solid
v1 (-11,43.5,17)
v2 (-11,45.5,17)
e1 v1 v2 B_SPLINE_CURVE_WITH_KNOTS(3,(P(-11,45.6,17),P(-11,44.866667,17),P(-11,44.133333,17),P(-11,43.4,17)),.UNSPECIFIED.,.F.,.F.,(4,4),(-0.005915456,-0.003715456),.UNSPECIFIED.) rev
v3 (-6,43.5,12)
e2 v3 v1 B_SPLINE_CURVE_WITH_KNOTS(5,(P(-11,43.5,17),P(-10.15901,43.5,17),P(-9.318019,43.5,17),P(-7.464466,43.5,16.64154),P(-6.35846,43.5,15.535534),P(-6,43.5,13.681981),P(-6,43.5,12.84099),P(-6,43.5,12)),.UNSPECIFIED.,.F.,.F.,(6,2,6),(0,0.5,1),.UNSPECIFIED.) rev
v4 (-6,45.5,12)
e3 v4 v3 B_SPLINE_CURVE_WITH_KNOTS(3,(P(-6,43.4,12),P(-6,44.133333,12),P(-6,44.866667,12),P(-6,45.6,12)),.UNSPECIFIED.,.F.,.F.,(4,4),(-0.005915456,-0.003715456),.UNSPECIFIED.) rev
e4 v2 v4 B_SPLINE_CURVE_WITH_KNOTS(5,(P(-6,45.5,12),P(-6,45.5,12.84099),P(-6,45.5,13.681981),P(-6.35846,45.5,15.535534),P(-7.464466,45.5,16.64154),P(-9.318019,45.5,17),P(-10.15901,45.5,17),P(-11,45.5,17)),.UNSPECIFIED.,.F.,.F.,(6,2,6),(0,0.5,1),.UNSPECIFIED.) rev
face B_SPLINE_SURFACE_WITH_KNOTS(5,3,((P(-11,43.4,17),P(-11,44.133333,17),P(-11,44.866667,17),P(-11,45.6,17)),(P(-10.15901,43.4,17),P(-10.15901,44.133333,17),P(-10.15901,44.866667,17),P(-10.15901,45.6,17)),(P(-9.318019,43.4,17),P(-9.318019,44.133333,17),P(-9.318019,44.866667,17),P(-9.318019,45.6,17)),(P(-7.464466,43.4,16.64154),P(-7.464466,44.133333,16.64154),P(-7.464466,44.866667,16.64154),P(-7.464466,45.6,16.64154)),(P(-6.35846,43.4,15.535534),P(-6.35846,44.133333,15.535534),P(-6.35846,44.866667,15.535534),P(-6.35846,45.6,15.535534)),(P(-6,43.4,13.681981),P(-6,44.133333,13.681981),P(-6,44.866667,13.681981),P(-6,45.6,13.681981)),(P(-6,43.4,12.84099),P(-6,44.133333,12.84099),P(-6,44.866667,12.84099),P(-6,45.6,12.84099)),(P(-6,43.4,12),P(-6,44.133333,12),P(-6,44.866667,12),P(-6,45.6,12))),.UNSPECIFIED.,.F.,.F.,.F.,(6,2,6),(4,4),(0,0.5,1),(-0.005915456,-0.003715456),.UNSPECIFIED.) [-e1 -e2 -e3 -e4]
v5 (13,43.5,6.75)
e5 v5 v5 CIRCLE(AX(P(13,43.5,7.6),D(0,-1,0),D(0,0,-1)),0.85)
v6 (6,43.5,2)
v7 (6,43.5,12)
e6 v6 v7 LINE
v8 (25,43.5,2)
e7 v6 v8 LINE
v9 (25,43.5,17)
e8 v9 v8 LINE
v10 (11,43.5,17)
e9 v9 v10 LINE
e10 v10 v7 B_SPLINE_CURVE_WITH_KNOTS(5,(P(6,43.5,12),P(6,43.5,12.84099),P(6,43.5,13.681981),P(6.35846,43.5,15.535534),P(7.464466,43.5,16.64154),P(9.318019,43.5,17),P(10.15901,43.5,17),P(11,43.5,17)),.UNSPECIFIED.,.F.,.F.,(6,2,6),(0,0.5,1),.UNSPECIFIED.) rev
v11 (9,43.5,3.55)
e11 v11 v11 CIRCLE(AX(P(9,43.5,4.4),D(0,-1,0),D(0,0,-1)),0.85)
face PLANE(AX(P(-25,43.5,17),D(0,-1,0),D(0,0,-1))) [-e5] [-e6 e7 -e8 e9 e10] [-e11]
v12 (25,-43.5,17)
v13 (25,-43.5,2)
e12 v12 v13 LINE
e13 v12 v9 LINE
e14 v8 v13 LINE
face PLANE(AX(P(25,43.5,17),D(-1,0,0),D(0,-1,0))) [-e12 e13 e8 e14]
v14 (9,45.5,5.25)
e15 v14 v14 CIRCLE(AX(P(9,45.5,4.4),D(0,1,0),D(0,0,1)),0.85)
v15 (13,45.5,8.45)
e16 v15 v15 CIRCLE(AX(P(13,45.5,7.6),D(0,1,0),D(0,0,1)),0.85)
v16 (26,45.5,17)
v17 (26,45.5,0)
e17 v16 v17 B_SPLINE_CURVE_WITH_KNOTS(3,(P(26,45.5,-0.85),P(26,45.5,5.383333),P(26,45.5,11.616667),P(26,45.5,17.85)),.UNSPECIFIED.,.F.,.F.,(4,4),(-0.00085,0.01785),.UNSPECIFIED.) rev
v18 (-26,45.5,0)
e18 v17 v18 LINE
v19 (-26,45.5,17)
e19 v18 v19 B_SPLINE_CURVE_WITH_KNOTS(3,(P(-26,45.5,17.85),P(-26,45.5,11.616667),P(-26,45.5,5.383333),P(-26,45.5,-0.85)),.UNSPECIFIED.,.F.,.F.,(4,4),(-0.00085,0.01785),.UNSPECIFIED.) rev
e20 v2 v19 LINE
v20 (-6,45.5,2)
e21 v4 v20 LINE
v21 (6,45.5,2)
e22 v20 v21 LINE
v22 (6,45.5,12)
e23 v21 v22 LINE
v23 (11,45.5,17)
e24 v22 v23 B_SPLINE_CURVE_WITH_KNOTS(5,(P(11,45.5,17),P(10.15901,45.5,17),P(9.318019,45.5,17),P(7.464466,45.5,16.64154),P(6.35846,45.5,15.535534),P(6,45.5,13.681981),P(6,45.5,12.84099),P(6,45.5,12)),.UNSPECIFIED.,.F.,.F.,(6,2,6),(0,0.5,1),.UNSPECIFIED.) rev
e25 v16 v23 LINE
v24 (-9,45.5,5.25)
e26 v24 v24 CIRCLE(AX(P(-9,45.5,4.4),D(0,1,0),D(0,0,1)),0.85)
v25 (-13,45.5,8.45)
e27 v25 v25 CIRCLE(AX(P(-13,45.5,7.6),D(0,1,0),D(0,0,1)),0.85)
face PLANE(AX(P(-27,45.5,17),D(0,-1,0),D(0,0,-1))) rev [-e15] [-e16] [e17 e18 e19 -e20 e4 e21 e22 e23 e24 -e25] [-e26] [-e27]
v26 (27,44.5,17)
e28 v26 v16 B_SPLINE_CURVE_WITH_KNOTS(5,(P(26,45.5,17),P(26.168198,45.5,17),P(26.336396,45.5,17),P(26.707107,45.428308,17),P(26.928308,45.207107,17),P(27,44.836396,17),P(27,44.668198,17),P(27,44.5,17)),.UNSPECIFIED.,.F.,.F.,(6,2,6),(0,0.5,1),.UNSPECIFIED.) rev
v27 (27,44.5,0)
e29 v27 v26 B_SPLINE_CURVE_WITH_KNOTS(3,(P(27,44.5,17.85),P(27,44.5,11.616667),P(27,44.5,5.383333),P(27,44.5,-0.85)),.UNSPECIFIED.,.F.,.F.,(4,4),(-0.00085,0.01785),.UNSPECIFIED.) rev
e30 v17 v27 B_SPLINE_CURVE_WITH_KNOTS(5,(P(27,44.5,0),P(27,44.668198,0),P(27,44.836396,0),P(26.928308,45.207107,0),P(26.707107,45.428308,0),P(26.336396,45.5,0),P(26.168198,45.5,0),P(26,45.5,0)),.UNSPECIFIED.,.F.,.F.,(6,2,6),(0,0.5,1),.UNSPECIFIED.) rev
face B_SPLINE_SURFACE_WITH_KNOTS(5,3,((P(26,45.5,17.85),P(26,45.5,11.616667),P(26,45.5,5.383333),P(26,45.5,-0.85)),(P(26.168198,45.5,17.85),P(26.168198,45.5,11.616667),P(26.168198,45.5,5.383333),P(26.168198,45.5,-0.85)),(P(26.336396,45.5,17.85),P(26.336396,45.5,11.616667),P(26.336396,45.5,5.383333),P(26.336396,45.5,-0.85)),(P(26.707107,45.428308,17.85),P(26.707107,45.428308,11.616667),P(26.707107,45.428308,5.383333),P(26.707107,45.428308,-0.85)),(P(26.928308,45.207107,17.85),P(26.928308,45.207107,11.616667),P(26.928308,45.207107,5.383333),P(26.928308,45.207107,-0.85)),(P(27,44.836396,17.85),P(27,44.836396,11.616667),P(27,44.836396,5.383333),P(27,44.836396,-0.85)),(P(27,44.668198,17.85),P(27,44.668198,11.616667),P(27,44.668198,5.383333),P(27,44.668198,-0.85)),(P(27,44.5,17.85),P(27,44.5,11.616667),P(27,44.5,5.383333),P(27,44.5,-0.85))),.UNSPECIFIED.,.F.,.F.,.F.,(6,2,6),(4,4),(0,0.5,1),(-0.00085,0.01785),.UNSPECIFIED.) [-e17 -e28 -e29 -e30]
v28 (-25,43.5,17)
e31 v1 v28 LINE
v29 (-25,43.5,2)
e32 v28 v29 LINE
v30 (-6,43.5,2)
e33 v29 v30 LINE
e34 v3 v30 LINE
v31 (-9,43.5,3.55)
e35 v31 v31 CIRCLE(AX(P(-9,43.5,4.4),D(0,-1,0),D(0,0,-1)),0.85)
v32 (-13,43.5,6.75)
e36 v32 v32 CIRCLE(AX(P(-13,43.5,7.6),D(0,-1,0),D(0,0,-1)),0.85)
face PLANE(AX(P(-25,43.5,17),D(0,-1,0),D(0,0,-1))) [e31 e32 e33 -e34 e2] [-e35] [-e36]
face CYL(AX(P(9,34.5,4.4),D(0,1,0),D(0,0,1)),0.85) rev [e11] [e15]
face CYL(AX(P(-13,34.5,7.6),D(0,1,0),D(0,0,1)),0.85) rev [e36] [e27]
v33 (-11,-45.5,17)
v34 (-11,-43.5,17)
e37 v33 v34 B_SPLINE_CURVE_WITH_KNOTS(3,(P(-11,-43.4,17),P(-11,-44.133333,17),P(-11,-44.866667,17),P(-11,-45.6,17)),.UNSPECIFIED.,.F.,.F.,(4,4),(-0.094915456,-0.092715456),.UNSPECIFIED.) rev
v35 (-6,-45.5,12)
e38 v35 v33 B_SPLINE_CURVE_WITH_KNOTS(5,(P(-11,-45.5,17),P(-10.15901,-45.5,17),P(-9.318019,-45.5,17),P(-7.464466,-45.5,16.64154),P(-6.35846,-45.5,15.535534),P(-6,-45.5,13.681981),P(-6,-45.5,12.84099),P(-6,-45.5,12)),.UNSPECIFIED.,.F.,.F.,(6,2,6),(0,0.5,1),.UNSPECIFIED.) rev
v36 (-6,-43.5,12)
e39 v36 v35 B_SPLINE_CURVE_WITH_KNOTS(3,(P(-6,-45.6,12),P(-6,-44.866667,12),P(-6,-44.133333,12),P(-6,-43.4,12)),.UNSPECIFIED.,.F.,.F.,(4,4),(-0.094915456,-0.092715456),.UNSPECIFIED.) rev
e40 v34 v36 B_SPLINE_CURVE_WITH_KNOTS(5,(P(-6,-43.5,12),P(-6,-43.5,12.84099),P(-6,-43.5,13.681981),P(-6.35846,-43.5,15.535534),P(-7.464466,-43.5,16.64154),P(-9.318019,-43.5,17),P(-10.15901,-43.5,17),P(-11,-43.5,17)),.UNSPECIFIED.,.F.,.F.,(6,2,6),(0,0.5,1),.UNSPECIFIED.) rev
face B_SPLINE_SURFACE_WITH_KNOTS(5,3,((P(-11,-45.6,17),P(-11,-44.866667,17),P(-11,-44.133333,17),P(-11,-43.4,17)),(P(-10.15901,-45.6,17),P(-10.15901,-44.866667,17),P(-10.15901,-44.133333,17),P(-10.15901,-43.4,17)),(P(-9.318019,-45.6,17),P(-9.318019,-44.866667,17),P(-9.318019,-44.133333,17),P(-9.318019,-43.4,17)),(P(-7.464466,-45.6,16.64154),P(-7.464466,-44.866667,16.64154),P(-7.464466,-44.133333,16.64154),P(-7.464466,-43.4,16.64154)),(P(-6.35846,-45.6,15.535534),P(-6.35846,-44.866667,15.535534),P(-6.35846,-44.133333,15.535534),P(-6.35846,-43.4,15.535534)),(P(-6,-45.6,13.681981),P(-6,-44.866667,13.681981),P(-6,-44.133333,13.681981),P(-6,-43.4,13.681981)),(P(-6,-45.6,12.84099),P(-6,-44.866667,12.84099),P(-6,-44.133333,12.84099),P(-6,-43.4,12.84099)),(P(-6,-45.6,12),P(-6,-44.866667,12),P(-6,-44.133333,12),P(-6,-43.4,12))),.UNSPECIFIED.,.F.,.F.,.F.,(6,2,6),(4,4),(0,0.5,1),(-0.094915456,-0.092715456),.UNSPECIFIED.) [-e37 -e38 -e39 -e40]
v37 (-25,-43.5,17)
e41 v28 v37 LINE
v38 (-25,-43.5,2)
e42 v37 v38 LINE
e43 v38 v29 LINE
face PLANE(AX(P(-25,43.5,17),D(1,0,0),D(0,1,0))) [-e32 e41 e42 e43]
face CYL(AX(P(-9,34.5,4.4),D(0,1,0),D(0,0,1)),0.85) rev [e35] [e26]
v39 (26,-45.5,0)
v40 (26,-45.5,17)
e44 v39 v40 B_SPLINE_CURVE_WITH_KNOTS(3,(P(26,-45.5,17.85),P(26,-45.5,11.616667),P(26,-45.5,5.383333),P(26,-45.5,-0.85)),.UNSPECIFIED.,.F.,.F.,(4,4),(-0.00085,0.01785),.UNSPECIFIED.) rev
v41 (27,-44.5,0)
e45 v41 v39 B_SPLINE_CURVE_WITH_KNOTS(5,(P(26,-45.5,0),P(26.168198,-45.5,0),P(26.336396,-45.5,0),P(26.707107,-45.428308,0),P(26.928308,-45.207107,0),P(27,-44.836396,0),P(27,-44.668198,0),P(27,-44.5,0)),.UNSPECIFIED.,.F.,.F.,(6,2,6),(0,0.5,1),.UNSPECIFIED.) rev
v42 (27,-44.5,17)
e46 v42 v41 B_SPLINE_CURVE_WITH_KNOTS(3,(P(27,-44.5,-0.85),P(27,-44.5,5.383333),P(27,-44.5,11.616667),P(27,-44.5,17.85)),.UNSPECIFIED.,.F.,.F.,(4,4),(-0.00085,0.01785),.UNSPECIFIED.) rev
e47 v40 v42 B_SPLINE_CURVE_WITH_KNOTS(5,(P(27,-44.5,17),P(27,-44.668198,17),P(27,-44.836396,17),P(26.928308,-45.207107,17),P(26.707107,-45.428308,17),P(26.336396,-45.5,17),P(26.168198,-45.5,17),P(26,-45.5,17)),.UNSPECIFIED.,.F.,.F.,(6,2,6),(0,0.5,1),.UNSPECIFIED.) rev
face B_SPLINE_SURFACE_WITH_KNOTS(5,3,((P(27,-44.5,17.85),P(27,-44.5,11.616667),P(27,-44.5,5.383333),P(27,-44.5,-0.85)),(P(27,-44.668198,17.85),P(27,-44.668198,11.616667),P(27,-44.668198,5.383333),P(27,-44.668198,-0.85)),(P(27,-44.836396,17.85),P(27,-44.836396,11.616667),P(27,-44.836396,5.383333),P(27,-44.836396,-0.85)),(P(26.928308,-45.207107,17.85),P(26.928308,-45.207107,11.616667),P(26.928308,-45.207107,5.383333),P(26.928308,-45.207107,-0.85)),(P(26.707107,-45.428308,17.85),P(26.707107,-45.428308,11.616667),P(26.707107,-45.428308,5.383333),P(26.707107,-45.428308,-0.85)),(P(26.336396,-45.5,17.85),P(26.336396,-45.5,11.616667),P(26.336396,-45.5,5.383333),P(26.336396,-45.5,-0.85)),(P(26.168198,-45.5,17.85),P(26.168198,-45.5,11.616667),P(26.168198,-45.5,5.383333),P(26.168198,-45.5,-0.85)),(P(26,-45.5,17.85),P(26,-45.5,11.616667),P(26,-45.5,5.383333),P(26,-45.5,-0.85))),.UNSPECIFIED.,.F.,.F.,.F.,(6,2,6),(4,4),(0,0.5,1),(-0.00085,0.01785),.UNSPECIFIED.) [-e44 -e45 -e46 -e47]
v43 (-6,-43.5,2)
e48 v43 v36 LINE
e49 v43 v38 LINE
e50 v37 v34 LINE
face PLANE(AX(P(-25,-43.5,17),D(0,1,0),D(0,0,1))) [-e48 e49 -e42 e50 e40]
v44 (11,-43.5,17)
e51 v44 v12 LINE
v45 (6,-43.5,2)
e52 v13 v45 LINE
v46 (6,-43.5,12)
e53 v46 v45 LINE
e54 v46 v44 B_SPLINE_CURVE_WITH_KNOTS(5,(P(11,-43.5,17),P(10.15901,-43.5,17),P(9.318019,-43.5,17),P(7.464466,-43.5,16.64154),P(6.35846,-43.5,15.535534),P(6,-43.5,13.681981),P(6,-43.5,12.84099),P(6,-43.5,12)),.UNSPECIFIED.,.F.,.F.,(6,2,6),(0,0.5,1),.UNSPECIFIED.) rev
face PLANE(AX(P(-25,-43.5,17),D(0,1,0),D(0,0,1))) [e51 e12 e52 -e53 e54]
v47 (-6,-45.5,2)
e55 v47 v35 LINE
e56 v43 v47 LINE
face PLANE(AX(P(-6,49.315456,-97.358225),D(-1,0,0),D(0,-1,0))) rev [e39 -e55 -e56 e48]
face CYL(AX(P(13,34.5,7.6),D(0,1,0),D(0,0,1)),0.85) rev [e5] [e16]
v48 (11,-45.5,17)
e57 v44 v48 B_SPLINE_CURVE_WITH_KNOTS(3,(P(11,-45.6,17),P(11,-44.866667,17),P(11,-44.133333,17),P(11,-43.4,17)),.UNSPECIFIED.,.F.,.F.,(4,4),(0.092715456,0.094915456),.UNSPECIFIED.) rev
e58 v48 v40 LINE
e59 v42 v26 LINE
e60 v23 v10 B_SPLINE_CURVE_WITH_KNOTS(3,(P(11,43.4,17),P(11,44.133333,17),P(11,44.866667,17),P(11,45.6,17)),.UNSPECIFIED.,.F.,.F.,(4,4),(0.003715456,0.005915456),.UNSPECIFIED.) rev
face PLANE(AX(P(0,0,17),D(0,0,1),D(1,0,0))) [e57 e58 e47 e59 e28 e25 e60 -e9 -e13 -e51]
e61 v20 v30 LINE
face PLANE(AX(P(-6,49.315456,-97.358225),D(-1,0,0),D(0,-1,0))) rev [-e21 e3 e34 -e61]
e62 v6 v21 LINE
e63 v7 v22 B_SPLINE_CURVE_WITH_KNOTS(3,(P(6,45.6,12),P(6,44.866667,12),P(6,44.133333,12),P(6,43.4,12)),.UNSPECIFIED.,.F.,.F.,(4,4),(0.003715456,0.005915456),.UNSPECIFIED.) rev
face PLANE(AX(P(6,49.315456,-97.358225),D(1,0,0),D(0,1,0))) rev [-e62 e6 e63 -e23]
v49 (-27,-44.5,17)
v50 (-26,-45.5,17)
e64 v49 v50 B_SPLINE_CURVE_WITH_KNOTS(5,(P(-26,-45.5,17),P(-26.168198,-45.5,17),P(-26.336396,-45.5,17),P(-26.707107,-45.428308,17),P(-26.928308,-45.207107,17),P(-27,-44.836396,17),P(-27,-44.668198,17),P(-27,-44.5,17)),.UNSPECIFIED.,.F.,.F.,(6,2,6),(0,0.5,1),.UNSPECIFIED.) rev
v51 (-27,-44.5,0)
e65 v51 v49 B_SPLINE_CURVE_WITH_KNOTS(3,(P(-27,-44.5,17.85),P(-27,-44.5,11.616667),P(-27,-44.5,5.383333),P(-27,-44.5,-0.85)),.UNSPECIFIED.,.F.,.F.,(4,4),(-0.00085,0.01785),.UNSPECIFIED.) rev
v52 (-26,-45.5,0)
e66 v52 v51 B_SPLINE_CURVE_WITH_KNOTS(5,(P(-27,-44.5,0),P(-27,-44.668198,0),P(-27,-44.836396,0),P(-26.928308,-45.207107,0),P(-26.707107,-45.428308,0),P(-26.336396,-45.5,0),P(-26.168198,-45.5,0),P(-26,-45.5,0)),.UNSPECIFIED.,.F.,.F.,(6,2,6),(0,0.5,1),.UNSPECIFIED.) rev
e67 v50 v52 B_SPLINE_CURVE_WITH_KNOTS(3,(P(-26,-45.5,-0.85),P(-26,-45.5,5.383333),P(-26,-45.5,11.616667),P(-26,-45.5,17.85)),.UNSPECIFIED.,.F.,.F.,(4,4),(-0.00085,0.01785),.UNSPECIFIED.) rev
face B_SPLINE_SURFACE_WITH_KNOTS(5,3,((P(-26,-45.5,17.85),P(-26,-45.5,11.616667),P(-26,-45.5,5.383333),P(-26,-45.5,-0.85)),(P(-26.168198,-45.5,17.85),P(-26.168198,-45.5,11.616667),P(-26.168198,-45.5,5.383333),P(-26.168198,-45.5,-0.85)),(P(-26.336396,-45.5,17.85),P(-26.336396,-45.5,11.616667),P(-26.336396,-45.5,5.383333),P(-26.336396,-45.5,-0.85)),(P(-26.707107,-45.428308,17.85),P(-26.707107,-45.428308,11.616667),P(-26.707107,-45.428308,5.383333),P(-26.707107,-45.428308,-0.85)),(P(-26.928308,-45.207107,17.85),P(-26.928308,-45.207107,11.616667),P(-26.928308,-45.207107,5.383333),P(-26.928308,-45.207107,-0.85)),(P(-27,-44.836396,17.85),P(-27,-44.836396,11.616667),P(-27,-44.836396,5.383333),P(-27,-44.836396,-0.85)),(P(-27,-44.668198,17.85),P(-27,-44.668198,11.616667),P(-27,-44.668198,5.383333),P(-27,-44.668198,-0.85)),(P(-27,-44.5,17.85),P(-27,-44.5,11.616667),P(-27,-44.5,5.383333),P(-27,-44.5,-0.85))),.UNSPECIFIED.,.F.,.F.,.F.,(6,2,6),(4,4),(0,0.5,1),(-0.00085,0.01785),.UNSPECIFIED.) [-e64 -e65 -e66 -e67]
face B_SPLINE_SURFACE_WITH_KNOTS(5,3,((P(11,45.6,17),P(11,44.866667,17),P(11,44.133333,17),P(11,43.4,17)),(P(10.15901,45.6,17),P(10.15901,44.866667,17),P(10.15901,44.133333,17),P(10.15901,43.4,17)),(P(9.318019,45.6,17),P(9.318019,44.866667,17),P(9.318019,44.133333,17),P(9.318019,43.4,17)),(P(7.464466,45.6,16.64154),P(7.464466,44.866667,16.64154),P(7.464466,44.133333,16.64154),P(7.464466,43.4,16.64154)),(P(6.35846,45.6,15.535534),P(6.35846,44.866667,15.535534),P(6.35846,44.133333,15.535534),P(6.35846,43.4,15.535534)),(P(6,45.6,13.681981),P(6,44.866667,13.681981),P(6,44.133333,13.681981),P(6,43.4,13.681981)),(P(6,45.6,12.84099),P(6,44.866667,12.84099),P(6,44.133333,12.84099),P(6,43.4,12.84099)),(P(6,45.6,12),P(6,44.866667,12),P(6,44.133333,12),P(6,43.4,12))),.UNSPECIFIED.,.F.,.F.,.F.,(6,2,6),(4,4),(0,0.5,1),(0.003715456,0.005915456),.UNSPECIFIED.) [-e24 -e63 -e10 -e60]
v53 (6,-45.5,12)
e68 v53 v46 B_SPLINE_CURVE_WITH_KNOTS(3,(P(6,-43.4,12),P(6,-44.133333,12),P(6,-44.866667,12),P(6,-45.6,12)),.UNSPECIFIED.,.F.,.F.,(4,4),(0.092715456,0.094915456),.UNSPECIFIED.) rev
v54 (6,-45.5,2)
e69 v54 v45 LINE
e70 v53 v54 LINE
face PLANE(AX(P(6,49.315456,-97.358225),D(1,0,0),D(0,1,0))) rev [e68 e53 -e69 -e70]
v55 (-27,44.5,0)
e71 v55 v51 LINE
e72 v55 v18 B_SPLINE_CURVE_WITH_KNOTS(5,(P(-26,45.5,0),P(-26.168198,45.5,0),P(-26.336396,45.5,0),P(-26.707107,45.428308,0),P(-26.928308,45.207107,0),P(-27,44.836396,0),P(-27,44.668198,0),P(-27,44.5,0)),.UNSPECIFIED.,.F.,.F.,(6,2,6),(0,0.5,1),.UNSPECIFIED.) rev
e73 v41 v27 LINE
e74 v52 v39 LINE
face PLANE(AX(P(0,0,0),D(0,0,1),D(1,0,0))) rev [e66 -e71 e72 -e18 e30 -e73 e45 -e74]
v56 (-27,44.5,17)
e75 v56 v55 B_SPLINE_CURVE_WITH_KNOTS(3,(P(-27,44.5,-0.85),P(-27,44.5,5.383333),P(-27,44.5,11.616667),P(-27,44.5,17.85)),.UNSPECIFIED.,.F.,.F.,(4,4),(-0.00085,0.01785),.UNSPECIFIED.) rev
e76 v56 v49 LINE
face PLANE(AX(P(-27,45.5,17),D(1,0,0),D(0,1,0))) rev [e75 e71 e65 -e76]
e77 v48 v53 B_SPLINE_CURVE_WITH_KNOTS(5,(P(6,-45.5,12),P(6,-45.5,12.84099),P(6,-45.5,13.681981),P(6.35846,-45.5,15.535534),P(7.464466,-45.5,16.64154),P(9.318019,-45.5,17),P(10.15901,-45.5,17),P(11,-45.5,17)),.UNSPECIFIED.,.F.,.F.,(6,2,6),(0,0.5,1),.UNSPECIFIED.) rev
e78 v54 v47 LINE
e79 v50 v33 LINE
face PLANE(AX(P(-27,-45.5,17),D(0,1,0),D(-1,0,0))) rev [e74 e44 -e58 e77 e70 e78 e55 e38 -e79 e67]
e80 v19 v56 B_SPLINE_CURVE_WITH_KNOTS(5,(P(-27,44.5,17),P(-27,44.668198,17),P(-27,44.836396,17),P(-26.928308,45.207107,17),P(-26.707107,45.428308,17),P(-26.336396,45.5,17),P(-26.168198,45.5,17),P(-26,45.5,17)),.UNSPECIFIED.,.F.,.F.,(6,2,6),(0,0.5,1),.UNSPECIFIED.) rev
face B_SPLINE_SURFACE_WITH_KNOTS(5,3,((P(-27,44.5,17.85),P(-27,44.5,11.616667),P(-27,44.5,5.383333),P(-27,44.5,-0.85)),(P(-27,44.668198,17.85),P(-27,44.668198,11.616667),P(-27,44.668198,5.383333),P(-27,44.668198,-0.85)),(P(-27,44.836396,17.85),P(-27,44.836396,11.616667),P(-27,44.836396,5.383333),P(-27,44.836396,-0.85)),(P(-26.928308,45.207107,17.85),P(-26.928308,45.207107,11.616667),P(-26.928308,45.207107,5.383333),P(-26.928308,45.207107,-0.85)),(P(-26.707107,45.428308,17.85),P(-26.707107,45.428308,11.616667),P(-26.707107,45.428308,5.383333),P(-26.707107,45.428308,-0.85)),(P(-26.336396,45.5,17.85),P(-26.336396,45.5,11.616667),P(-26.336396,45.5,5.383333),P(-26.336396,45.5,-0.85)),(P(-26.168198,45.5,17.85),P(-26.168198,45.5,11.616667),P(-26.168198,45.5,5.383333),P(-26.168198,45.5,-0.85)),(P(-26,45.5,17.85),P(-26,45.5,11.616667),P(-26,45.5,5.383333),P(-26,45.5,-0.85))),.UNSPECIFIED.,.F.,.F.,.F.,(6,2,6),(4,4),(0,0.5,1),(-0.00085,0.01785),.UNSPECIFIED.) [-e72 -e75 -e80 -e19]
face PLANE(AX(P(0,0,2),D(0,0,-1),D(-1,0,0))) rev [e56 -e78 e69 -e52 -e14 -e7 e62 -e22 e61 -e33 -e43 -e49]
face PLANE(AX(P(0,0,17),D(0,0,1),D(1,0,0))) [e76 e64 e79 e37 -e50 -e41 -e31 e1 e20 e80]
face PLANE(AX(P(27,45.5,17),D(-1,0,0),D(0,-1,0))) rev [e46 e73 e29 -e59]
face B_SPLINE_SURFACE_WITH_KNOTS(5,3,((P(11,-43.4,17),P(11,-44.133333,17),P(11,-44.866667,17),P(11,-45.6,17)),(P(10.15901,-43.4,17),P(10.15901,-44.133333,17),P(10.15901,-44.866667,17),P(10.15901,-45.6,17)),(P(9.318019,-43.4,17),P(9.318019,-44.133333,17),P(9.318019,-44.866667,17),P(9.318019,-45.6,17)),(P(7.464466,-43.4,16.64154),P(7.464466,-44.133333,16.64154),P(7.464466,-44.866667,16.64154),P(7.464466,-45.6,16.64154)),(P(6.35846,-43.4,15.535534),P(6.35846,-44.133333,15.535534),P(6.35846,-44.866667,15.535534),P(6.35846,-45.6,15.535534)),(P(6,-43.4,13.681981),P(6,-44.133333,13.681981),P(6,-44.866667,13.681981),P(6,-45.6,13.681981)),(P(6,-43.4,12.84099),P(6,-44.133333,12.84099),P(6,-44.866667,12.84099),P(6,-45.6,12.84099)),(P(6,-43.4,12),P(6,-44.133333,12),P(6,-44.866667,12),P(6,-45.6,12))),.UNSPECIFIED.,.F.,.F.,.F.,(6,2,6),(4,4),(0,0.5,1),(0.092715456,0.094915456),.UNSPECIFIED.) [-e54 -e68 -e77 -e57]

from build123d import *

# Parameters (mm, degrees)
SKETCH_1_W          = 54
SKETCH_1_H          = 91
SKETCH_1_W_2        = 50
SKETCH_1_H_2        = 87
EXTRUDE_1_DEPTH     = 17
SKETCH_2_W          = 54
SKETCH_2_H          = 91
EXTRUDE_2_DEPTH     = 2
SKETCH_3_W          = 12
SKETCH_3_H          = 98.630911944
CUT_EXTRUDE_1_DEPTH = 15
SKETCH_5_R          = 0.85
CUT_EXTRUDE_2_DEPTH = 11
FILLET_1_SIZE       = 1
FILLET_2_SIZE       = 5


with BuildPart() as part:
    # 草图1 → 凸台-拉伸1 (new body)
    with BuildSketch(Plane.XY):
        Rectangle(SKETCH_1_W, SKETCH_1_H)
        Rectangle(SKETCH_1_W_2, SKETCH_1_H_2, mode=Mode.SUBTRACT)
    extrude(amount=EXTRUDE_1_DEPTH)

    # 草图2 → 凸台-拉伸2 (add)
    with BuildSketch(Plane(origin=(0, 0, 0), x_dir=(-1, 0, 0), z_dir=(0, 0, -1))):
        Rectangle(SKETCH_2_W, SKETCH_2_H)
    extrude(amount=-EXTRUDE_2_DEPTH)

    # 草图3 → 切除-拉伸1 (cut)
    with BuildSketch(Plane.XY.offset(17)):
        Rectangle(SKETCH_3_W, SKETCH_3_H)
    extrude(amount=-CUT_EXTRUDE_1_DEPTH, mode=Mode.SUBTRACT)

    # 草图5 → 切除-拉伸2 (cut)
    with BuildSketch(Plane(origin=(0, 45.5, 0), x_dir=(1, 0, 0), z_dir=(0, 1, 0))):
        with Locations(Location((-9, -4.4, 0), (0, 0, 270))):
            Circle(SKETCH_5_R)
        with Locations(Location((-13, -7.6, 0), (0, 0, 270))):
            Circle(SKETCH_5_R)
        with Locations(Location((9, -4.4, 0), (0, 0, 270))):
            Circle(SKETCH_5_R)
        with Locations(Location((13, -7.6, 0), (0, 0, 270))):
            Circle(SKETCH_5_R)
    extrude(amount=-CUT_EXTRUDE_2_DEPTH, mode=Mode.SUBTRACT)

    # 圆角1
    # a fillet whose section is not a circle: 1 mm, written as the material it takes off along each edge
    with BuildSketch(Plane(origin=(-27, -45.5, -2.5), x_dir=(0, 1, 0), z_dir=(0, 0, 1)), Plane(origin=(27, -45.5, 19.5), x_dir=(0, 1, 0), z_dir=(0, 0, -1)), Plane(origin=(27, 45.5, 19.5), x_dir=(-1, 0, 0), z_dir=(0, 0, -1)), Plane(origin=(-27, 45.5, -2.5), x_dir=(1, 0, 0), z_dir=(0, 0, 1))) as fillet_1_piece_1:
        with BuildLine():
            add(Edge.make_bspline([(FILLET_1_SIZE, 0), (FILLET_1_SIZE * 0.831801948466, 0), (FILLET_1_SIZE * 0.663603896932, 0), (FILLET_1_SIZE * 0.292893218813, -FILLET_1_SIZE * 0.0716919198361), (FILLET_1_SIZE * 0.0716919198361, -FILLET_1_SIZE * 0.292893218813), (0, -FILLET_1_SIZE * 0.663603896932), (0, -FILLET_1_SIZE * 0.831801948466), (0, -FILLET_1_SIZE)], knots=[0, 0, 0, 0, 0, 0, 0.5, 0.5, 1, 1, 1, 1, 1, 1], degree=5))
            Line((0, -FILLET_1_SIZE), (0, 0))
            Line((0, 0), (FILLET_1_SIZE, 0))
        make_face()
    extrude(amount=22, mode=Mode.SUBTRACT)

    # 圆角2
    # a fillet whose section is not a circle: 5 mm, written as the material it takes off along each edge
    with BuildSketch(Plane(origin=(6, -31, 17), x_dir=(1, 0, 0), z_dir=(0, -1, 0)), Plane(origin=(-6, -58, 17), x_dir=(-1, 0, 0), z_dir=(0, 1, 0)), Plane(origin=(6, 58, 17), x_dir=(1, 0, 0), z_dir=(0, -1, 0))) as fillet_2_piece_1:
        with BuildLine():
            add(Edge.make_bspline([(FILLET_2_SIZE, 0), (FILLET_2_SIZE * 0.831801948466, 0), (FILLET_2_SIZE * 0.663603896932, 0), (FILLET_2_SIZE * 0.292893218813, -FILLET_2_SIZE * 0.0716919198361), (FILLET_2_SIZE * 0.0716919198361, -FILLET_2_SIZE * 0.292893218813), (0, -FILLET_2_SIZE * 0.663603896932), (0, -FILLET_2_SIZE * 0.831801948466), (0, -FILLET_2_SIZE)], knots=[0, 0, 0, 0, 0, 0, 0.5, 0.5, 1, 1, 1, 1, 1, 1], degree=5))
            Line((0, -FILLET_2_SIZE), (0, 0))
            Line((0, 0), (FILLET_2_SIZE, 0))
        make_face()
    extrude(amount=27, mode=Mode.SUBTRACT)
    with BuildSketch(Plane(origin=(-6, 31, 17), x_dir=(0, 0, -1), z_dir=(0, 1, 0))) as fillet_2_piece_2:
        with BuildLine():
            add(Edge.make_bspline([(FILLET_2_SIZE, 0), (FILLET_2_SIZE * 0.831801948466, 0), (FILLET_2_SIZE * 0.663603896932, 0), (FILLET_2_SIZE * 0.292893218813, FILLET_2_SIZE * 0.0716919198361), (FILLET_2_SIZE * 0.0716919198361, FILLET_2_SIZE * 0.292893218813), (0, FILLET_2_SIZE * 0.663603896932), (0, FILLET_2_SIZE * 0.831801948466), (0, FILLET_2_SIZE)], knots=[0, 0, 0, 0, 0, 0, 0.5, 0.5, 1, 1, 1, 1, 1, 1], degree=5))
            Line((0, FILLET_2_SIZE), (0, 0))
            Line((0, 0), (FILLET_2_SIZE, 0))
        make_face()
    extrude(amount=27, mode=Mode.SUBTRACT)


solid = part.part
